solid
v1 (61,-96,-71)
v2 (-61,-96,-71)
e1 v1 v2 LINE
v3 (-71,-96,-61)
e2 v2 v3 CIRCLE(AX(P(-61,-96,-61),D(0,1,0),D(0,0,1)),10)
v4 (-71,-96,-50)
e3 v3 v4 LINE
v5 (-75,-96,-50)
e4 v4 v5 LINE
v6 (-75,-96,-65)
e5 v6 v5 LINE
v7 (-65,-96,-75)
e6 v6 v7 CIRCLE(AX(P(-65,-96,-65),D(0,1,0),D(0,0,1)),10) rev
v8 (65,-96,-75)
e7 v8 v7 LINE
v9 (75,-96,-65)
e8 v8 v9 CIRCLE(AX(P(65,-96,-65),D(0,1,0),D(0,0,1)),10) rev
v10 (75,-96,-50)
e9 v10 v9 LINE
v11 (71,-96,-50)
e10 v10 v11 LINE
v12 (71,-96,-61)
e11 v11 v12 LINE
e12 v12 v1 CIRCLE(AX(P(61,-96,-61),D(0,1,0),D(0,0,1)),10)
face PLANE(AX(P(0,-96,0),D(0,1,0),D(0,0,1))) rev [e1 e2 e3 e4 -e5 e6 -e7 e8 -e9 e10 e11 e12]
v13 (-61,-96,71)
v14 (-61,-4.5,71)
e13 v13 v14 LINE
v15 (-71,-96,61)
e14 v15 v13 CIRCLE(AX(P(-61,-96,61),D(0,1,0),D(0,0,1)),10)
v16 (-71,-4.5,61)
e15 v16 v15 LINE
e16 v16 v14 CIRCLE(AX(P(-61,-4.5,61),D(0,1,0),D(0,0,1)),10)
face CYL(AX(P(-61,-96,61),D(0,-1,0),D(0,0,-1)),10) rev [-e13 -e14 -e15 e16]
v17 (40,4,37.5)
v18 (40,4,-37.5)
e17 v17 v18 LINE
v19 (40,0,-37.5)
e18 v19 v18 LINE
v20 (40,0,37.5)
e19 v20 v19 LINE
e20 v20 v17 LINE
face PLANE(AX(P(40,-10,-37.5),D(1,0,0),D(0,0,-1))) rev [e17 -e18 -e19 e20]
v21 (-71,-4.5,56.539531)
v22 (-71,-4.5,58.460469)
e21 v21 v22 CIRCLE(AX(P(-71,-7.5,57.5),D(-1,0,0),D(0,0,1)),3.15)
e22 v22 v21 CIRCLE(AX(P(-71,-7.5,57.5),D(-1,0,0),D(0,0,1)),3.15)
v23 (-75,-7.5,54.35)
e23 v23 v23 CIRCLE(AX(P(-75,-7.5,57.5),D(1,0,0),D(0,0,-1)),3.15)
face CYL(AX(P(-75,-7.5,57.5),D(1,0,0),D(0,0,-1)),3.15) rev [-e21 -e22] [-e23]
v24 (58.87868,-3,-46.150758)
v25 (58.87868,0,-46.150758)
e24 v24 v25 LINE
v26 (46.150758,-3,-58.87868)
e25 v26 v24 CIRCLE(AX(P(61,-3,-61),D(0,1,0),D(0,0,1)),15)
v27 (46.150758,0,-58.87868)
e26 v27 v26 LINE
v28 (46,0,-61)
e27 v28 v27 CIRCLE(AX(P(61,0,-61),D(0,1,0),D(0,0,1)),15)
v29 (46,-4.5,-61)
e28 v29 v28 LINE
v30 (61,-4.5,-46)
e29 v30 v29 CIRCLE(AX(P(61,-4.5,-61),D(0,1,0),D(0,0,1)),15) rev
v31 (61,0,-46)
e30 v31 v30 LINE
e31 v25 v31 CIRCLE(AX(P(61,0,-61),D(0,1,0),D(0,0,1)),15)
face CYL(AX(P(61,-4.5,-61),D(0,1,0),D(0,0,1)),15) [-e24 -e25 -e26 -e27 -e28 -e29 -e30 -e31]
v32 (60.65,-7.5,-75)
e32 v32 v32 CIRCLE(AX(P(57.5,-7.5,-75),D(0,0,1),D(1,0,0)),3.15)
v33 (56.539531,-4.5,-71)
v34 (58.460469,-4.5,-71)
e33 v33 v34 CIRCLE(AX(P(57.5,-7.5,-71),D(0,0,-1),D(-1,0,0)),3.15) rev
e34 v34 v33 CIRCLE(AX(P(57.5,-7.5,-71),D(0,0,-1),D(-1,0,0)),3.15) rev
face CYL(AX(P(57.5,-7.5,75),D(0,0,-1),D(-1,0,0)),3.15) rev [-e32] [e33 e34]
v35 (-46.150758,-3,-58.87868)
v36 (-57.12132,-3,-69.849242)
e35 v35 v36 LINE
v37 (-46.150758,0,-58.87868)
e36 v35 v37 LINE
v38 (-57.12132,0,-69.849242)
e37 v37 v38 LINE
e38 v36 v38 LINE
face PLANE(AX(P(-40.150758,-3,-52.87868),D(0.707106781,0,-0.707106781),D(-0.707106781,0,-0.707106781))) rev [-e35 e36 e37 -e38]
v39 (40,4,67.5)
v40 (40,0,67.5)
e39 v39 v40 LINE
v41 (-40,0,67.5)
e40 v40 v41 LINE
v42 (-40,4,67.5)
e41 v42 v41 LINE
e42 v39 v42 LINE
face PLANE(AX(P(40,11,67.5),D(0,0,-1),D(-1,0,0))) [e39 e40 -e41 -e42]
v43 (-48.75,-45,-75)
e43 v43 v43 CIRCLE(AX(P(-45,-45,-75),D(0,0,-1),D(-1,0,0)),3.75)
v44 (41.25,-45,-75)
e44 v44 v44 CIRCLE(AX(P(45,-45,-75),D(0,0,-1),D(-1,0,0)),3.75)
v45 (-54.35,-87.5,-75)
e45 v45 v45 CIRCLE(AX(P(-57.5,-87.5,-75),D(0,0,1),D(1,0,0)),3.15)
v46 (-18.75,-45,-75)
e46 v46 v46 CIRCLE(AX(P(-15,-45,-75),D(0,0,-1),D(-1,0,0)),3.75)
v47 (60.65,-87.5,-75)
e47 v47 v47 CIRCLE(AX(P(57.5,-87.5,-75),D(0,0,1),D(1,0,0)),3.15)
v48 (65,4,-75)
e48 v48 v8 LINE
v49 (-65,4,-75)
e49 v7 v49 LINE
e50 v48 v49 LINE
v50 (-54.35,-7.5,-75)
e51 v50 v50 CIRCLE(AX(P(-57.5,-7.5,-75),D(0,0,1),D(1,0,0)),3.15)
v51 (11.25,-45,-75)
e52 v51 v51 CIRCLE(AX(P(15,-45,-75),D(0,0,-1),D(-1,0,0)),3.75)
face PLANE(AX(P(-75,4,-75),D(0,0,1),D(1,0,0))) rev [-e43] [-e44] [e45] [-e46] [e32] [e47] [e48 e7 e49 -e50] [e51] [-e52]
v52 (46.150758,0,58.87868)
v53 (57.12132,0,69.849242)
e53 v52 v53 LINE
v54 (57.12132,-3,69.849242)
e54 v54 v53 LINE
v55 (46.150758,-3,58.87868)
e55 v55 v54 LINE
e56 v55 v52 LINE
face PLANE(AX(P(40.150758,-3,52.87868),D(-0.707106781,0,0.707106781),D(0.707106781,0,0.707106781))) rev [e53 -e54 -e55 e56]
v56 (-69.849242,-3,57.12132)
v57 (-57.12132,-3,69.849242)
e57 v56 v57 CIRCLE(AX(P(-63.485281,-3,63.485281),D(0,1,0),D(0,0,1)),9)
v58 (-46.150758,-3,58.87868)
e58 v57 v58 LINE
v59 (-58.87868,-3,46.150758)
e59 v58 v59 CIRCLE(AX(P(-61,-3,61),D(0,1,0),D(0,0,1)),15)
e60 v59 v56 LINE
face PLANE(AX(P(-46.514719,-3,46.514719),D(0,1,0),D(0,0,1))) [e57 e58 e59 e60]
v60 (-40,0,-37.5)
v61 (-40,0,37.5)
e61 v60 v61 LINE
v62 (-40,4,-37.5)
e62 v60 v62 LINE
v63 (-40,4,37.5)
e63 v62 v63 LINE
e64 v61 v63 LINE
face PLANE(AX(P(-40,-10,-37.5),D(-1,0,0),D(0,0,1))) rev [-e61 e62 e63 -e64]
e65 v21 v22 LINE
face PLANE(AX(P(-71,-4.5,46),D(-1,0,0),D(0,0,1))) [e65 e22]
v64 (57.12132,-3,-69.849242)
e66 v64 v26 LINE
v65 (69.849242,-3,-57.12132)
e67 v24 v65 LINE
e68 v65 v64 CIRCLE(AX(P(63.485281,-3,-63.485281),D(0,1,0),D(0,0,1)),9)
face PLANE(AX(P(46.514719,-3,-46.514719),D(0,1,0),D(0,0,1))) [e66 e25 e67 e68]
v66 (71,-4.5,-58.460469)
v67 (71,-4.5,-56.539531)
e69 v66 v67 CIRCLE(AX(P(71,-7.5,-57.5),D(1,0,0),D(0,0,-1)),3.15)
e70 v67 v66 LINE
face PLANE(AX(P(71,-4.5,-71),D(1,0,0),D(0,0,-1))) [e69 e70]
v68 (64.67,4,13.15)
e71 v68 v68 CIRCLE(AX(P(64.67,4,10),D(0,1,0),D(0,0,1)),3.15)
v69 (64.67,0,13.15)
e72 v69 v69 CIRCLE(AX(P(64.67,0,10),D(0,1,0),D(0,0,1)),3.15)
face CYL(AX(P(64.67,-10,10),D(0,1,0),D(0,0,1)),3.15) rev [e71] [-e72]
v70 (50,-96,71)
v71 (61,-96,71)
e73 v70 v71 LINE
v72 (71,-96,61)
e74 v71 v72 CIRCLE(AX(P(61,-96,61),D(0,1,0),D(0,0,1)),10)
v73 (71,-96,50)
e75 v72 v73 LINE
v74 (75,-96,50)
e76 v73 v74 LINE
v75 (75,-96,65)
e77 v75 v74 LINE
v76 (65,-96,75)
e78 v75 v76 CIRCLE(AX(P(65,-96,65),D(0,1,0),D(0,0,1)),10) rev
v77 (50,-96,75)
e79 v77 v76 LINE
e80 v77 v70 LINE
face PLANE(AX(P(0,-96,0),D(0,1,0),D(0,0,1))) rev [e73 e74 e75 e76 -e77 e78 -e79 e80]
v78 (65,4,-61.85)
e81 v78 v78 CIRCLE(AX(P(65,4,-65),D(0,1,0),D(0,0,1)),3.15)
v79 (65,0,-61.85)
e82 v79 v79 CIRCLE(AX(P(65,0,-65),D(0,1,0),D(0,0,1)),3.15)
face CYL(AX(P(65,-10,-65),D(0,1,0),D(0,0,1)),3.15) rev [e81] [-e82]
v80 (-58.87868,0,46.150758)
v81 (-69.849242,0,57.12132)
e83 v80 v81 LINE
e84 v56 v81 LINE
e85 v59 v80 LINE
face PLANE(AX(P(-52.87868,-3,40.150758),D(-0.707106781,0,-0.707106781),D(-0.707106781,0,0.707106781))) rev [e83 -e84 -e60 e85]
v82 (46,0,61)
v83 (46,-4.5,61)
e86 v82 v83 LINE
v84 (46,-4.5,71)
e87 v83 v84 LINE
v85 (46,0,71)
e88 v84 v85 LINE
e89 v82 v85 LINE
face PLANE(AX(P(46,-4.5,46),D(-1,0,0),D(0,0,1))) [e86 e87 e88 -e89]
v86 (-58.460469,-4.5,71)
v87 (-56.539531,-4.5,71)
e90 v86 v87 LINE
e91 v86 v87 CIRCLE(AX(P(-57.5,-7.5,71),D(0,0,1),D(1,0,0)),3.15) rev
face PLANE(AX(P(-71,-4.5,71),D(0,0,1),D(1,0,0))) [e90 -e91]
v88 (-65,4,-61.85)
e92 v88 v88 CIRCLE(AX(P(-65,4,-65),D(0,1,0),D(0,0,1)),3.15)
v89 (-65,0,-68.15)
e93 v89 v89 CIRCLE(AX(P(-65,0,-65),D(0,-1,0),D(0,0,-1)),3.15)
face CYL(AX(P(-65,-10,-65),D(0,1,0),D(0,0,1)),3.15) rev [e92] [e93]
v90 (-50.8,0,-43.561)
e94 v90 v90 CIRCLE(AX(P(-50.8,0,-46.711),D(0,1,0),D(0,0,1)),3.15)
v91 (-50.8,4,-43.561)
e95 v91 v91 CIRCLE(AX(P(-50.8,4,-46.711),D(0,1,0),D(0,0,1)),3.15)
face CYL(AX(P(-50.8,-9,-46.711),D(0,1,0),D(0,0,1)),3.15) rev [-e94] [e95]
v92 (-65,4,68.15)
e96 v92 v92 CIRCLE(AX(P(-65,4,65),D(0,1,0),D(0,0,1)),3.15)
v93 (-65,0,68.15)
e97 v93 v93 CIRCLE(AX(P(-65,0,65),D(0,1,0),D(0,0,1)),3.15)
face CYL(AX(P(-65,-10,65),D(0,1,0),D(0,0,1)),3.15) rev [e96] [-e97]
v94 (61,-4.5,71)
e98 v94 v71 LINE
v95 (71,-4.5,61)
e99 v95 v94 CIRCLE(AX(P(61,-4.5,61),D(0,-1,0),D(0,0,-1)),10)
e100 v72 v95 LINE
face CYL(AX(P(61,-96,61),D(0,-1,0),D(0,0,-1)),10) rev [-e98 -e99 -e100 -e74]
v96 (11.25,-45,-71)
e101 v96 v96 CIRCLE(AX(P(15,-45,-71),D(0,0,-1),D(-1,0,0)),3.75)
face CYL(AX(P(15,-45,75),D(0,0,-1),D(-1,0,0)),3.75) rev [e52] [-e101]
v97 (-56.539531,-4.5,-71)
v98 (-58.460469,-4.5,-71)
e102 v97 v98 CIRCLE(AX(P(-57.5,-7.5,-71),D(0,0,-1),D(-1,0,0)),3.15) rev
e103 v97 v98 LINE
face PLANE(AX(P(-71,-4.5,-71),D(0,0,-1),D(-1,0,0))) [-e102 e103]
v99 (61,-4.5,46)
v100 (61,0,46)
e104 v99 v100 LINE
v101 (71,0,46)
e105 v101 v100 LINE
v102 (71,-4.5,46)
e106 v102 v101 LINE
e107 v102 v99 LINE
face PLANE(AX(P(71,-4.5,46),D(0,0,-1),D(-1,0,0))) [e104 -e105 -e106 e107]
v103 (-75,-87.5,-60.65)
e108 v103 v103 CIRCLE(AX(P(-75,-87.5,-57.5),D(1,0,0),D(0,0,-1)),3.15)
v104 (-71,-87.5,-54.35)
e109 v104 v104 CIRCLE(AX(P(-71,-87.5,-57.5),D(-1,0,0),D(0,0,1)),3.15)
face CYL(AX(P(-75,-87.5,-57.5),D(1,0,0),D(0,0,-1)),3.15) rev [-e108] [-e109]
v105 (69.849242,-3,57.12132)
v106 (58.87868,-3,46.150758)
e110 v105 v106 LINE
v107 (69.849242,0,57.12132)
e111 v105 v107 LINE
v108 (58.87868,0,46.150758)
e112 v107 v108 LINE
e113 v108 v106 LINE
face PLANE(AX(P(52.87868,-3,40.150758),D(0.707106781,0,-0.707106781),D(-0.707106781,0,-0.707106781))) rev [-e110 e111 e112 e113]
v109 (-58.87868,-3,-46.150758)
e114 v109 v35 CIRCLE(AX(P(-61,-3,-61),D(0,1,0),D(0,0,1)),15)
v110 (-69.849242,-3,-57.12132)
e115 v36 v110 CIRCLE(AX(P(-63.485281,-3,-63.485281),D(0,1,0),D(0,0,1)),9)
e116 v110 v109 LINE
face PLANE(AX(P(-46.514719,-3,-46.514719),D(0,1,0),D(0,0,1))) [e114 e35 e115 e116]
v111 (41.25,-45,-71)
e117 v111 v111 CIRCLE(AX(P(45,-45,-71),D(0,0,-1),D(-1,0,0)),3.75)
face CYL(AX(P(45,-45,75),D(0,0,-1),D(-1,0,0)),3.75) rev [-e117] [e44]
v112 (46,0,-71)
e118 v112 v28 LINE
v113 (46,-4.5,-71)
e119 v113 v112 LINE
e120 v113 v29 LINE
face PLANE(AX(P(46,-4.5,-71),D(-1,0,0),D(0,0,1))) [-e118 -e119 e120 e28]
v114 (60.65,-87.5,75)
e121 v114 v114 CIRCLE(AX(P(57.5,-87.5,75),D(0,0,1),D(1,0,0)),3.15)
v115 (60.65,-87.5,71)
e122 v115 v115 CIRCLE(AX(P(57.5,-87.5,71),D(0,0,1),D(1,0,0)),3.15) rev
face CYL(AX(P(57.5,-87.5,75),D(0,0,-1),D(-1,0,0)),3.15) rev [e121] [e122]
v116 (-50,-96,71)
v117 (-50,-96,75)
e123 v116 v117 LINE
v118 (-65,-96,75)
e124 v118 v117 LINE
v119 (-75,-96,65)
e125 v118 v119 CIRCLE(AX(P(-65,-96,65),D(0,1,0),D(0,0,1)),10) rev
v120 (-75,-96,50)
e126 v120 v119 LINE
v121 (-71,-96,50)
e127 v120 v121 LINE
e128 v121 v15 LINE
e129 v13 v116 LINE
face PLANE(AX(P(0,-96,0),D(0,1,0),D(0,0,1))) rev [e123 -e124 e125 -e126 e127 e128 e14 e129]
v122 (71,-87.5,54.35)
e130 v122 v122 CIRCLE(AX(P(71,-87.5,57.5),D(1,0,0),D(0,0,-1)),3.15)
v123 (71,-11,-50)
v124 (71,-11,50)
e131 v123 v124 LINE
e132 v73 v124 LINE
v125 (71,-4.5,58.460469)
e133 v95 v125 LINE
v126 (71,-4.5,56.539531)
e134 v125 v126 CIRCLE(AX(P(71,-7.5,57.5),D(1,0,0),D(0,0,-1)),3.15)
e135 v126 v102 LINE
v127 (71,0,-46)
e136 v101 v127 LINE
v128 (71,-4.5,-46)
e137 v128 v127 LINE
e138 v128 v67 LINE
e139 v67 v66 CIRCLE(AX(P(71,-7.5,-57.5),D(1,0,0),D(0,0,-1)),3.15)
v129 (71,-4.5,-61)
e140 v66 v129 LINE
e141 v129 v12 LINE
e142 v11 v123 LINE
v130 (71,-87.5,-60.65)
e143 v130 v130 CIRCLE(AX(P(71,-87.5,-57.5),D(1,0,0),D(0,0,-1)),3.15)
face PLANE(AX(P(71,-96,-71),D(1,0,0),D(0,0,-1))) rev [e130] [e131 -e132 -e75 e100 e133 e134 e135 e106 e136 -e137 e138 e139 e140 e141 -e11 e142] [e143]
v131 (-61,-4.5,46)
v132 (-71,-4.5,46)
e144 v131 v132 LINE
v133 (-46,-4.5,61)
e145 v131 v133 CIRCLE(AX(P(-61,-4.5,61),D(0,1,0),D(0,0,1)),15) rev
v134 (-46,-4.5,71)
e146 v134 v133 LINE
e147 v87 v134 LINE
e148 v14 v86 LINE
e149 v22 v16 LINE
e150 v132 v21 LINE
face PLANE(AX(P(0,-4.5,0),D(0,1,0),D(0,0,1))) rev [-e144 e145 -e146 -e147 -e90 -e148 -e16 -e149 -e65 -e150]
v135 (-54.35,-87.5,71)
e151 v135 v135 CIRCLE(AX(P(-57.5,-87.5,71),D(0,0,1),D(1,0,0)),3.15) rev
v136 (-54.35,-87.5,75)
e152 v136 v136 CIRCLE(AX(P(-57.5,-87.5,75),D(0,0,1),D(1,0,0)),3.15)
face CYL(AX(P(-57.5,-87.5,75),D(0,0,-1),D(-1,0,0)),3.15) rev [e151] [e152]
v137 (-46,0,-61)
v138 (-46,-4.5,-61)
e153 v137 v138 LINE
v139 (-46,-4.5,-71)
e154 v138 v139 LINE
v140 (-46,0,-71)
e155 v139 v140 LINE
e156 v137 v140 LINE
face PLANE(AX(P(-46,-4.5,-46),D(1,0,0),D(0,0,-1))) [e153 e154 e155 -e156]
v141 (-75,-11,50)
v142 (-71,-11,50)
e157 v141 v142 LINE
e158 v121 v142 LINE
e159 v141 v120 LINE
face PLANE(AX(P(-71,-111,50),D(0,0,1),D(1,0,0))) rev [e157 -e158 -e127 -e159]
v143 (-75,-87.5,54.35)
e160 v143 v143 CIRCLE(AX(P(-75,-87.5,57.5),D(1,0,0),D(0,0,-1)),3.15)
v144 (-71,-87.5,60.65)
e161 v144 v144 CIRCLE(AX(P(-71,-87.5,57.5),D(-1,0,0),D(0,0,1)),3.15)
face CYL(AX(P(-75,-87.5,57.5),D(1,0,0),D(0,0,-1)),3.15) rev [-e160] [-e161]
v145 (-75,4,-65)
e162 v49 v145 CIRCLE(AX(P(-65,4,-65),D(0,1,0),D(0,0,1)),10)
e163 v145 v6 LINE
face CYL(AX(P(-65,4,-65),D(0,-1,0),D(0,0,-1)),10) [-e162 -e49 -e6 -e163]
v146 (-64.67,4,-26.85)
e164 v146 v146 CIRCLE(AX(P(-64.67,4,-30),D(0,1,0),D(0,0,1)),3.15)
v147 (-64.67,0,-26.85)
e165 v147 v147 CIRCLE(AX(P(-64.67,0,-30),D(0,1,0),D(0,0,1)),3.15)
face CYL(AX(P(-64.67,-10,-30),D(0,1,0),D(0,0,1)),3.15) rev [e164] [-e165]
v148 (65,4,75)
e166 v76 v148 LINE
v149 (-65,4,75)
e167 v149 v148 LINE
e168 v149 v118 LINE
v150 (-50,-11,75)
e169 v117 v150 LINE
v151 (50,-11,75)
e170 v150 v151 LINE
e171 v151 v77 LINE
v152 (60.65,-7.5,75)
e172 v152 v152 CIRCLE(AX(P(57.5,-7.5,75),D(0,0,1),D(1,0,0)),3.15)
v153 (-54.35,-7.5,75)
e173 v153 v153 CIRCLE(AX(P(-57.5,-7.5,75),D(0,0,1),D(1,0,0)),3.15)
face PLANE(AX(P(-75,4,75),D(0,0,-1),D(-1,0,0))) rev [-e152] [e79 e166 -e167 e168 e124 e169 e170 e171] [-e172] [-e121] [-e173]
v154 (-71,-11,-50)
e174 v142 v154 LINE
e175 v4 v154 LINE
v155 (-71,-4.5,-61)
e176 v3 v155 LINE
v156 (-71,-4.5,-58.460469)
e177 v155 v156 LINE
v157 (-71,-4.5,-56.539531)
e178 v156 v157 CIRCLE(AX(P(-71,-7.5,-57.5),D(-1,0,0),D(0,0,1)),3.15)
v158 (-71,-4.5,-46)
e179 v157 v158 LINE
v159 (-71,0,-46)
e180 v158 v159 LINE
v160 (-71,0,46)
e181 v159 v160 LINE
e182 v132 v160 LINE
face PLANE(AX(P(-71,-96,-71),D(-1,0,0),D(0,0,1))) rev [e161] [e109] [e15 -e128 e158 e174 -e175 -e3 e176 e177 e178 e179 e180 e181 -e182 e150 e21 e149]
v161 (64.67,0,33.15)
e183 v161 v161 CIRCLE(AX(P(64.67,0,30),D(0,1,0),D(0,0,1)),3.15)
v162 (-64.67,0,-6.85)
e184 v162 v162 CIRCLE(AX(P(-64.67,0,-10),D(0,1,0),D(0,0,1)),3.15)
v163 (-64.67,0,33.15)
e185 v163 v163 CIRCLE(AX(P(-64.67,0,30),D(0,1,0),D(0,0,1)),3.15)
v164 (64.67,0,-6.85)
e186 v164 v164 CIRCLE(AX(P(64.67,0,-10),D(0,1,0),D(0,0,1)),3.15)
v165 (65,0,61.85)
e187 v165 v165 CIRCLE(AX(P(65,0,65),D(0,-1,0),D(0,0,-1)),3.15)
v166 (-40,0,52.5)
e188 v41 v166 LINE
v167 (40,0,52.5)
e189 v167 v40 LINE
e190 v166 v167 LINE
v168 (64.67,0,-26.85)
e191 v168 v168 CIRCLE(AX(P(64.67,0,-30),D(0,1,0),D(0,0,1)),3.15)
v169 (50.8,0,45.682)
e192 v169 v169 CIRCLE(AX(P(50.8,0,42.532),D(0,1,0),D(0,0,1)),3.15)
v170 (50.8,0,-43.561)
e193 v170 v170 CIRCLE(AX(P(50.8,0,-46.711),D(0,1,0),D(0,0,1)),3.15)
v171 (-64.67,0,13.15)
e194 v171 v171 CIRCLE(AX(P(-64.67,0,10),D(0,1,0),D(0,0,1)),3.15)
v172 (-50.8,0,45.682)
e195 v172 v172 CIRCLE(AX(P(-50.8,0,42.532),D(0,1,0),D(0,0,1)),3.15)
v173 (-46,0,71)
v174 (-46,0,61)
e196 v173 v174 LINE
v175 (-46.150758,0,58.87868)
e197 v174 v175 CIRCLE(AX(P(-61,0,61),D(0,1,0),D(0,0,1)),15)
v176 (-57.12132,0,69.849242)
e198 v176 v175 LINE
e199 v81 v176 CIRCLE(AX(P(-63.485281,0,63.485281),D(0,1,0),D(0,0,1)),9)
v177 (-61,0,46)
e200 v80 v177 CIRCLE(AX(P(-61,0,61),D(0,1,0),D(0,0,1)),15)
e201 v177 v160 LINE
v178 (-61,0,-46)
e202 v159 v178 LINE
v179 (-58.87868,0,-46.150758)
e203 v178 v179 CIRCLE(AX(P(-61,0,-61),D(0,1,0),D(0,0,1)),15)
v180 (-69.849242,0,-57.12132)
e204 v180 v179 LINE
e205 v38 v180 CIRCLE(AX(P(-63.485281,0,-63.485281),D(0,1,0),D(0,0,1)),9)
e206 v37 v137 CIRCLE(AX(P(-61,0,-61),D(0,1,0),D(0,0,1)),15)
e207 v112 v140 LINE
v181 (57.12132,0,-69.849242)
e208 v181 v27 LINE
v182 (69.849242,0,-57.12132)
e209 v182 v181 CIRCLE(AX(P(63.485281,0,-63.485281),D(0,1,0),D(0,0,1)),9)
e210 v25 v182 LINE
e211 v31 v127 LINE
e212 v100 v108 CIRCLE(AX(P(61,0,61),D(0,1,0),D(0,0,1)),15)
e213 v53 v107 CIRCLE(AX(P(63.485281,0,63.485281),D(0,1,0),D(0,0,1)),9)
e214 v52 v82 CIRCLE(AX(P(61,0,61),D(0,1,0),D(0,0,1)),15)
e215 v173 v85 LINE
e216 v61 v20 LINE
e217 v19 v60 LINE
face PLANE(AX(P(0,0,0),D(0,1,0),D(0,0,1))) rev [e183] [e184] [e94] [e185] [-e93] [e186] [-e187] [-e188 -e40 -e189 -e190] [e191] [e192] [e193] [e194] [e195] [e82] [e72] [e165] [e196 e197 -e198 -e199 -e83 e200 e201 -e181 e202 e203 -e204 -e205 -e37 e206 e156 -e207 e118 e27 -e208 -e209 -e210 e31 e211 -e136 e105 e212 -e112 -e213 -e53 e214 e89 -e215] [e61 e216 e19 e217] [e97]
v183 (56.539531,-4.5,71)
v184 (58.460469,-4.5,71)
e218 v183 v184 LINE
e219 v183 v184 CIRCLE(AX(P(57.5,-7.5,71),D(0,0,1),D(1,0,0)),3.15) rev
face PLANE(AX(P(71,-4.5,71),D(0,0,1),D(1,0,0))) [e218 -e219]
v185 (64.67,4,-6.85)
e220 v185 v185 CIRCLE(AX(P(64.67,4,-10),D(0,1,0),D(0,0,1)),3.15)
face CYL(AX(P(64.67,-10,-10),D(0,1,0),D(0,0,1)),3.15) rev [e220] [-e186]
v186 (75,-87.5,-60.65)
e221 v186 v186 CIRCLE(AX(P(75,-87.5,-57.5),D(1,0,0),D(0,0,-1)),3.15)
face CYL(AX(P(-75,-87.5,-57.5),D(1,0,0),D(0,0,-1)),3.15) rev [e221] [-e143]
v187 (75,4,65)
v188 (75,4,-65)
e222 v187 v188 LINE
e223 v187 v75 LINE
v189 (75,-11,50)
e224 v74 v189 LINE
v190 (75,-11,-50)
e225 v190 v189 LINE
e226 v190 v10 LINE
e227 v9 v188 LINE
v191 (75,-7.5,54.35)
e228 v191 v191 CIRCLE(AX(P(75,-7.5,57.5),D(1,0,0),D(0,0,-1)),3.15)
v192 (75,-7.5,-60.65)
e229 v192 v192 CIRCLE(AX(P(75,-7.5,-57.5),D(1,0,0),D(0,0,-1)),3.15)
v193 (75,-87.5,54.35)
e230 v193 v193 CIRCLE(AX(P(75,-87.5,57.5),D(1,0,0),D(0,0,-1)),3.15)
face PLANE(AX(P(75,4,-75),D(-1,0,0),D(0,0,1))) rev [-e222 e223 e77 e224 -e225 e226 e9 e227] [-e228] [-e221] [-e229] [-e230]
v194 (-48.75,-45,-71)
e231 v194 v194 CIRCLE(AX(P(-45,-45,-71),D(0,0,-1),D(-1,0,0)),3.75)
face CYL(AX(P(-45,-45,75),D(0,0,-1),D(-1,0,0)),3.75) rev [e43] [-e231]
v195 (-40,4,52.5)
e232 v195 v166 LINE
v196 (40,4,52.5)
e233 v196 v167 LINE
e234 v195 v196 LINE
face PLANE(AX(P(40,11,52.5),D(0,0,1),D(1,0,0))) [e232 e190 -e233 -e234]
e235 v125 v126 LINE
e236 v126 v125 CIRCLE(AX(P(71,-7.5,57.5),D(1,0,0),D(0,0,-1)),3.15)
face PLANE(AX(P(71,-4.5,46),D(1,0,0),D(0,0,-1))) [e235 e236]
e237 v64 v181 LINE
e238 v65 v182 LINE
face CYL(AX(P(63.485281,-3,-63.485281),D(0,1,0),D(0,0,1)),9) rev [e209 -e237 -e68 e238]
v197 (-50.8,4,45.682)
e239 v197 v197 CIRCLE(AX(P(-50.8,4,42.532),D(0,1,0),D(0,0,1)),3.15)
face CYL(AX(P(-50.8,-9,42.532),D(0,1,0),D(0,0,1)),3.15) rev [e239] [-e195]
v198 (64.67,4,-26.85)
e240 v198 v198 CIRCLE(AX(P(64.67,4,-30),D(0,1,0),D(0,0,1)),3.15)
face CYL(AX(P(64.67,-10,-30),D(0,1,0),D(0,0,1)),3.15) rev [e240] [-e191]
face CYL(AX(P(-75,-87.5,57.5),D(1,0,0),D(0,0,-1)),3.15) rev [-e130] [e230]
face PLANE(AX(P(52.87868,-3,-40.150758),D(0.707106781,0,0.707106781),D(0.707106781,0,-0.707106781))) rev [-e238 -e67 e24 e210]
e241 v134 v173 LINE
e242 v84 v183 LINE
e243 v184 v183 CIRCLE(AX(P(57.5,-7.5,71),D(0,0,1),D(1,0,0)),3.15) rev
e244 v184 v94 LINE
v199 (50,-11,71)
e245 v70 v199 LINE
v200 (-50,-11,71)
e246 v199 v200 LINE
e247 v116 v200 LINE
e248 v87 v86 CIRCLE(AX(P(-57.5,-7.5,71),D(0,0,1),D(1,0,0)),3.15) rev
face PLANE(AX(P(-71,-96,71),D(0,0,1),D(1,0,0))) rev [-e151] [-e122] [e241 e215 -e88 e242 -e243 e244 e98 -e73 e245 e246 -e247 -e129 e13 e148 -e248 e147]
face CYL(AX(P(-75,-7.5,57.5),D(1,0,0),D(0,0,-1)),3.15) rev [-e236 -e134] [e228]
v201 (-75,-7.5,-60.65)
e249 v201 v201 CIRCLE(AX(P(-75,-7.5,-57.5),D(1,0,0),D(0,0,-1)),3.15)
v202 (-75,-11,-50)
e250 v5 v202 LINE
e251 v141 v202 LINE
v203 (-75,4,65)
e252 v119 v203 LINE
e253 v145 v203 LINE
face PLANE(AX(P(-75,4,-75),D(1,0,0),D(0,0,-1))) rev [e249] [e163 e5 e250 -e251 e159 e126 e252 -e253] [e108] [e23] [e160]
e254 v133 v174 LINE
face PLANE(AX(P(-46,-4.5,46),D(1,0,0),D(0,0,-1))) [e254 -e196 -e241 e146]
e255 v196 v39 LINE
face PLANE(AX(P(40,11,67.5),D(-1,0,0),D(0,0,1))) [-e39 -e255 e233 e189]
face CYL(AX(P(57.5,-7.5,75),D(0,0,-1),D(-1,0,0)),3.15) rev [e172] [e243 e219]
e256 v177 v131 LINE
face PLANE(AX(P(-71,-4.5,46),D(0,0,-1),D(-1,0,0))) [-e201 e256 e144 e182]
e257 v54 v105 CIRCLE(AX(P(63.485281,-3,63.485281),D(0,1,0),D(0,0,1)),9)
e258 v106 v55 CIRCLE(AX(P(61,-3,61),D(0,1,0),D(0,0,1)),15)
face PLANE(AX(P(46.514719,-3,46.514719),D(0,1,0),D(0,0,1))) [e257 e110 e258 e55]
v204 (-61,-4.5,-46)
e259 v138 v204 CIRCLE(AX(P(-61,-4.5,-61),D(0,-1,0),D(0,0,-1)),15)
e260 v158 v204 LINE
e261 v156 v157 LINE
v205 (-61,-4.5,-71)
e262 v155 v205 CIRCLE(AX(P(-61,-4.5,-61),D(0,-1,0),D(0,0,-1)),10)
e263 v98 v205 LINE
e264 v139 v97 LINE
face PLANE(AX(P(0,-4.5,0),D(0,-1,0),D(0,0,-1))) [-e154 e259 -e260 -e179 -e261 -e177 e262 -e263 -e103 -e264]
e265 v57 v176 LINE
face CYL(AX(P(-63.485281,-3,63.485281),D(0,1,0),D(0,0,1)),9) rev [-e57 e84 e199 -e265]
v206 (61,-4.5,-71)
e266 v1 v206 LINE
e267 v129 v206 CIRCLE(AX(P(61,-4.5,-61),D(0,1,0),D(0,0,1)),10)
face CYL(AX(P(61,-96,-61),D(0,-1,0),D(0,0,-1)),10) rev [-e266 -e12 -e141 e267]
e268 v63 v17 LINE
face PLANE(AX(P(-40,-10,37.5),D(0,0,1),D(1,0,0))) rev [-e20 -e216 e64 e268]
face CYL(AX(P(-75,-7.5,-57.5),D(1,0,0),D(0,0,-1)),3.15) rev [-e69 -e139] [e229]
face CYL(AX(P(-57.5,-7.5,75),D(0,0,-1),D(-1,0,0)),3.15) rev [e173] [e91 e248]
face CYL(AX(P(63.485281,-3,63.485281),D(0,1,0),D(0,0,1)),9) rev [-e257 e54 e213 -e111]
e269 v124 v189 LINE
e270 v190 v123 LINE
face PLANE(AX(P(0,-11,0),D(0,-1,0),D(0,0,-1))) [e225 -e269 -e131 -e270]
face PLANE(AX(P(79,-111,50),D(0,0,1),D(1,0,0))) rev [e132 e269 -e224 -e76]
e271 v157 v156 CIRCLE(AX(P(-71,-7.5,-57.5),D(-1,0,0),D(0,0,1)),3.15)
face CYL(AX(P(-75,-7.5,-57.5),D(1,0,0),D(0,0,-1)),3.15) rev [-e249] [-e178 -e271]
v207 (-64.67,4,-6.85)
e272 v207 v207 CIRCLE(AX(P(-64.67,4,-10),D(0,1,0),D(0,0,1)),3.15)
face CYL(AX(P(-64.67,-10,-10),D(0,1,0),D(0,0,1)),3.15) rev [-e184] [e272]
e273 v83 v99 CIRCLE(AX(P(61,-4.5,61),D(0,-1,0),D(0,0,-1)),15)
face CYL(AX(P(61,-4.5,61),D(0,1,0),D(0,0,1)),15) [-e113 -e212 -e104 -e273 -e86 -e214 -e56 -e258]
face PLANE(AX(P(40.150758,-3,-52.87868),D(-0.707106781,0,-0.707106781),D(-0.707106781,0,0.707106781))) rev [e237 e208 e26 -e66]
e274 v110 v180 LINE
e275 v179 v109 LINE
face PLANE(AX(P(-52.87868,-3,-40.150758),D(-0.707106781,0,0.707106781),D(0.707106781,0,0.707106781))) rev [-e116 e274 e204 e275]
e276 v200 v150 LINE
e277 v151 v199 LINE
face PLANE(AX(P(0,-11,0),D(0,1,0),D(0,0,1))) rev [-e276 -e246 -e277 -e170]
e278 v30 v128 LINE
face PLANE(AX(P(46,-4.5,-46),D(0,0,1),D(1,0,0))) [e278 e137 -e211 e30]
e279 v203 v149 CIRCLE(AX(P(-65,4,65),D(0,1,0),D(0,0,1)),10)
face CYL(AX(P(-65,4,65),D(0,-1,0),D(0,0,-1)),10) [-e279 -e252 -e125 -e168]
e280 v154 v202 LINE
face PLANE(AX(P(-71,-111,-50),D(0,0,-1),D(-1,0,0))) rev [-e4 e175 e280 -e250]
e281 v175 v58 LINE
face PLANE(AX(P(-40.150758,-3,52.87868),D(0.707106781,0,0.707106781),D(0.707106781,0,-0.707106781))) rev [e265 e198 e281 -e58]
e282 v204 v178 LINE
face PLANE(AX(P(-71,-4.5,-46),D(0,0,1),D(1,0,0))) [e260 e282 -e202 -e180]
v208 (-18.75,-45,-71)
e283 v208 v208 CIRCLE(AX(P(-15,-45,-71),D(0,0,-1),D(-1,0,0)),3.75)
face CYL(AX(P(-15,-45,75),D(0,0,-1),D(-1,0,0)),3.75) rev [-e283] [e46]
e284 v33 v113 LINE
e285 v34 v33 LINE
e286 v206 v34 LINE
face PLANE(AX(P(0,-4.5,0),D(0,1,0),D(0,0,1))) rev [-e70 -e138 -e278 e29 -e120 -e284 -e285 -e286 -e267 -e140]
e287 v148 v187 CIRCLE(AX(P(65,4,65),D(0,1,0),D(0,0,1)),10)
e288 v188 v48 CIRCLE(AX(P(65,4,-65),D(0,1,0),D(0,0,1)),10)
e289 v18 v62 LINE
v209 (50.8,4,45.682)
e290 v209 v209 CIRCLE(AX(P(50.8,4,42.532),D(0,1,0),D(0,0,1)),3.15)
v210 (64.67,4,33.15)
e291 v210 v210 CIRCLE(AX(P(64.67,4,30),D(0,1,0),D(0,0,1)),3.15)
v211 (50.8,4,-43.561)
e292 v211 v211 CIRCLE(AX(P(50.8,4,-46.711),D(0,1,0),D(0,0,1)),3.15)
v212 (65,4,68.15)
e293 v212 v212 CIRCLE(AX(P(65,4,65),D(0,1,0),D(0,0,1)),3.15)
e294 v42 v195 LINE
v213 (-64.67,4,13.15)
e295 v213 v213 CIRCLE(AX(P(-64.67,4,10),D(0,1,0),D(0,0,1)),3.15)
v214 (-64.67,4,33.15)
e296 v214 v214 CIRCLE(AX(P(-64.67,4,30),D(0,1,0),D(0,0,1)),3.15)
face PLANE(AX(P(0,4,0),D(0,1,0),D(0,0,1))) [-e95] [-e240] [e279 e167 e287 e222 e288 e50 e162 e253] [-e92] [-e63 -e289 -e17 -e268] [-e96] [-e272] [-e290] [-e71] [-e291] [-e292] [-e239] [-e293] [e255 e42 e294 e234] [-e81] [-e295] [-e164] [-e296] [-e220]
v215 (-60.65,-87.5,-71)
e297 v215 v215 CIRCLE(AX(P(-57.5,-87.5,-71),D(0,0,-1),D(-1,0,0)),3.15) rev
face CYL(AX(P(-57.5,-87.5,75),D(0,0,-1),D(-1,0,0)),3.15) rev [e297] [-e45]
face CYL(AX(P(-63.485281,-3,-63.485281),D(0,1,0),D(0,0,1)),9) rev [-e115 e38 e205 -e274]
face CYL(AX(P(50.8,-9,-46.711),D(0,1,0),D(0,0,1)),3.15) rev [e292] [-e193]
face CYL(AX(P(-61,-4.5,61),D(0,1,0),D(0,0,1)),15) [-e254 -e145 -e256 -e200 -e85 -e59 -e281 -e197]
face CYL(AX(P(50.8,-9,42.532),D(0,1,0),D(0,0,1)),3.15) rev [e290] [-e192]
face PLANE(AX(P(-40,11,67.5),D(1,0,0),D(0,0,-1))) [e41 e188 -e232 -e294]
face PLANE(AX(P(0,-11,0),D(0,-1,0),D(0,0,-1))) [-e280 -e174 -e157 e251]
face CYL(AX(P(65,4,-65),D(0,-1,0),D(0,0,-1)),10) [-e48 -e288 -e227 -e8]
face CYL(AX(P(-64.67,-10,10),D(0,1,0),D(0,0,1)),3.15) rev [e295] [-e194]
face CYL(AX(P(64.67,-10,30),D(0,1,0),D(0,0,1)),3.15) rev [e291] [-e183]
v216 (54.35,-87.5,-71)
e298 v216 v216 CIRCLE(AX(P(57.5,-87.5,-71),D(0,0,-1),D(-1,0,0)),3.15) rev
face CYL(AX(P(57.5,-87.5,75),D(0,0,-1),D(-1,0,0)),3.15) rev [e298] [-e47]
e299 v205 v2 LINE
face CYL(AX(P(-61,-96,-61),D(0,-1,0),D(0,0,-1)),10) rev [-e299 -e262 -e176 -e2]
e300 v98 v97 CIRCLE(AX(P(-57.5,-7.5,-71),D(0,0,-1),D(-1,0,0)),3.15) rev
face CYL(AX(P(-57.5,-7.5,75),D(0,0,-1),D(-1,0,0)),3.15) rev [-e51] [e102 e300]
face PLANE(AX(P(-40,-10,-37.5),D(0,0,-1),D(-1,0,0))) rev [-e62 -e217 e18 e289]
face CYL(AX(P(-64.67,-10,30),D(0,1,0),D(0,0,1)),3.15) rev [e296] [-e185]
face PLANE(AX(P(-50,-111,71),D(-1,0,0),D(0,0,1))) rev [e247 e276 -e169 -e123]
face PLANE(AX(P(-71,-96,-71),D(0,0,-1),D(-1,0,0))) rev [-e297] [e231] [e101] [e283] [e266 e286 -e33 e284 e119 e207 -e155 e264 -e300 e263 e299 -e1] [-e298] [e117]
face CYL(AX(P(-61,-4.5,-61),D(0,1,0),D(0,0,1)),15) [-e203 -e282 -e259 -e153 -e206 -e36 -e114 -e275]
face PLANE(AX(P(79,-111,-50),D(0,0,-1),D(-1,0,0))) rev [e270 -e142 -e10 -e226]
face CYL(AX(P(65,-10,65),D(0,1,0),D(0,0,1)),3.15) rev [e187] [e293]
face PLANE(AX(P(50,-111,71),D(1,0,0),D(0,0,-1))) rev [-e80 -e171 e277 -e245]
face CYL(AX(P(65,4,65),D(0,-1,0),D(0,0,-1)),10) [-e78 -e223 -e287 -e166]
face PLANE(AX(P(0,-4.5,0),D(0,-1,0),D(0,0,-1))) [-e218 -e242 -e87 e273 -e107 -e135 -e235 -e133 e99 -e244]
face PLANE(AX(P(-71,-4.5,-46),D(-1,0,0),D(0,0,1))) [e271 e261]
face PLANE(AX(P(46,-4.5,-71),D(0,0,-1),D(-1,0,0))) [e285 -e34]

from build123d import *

# Parameters (mm, degrees)
SKETCH9_R                 = 3.15
BOSS_EXTRUDE10_DEPTH      = 10
BOSS_EXTRUDE10_2_DEPTH    = 10
BOSS_EXTRUDE10_3_DEPTH    = 10
BOSS_EXTRUDE10_4_DEPTH    = 10
BOSS_EXTRUDE10_5_DEPTH    = 10
BOSS_EXTRUDE10_6_DEPTH    = 10
BOSS_EXTRUDE10_7_DEPTH    = 10
BOSS_EXTRUDE10_8_DEPTH    = 10
SKETCH10_W                = 80
SKETCH10_H                = 75
BOSS_EXTRUDE12_DEPTH      = 10
SKETCH15_R                = 3.15
BOSS_EXTRUDE17_DEPTH      = 10
BOSS_EXTRUDE17_2_DEPTH    = 10
BOSS_EXTRUDE17_3_DEPTH    = 10
BOSS_EXTRUDE17_4_DEPTH    = 10
SKETCH22_W                = 150
SKETCH22_H                = 150
BOSS_EXTRUDE19_DEPTH      = 4
SKETCH29_W                = 150
SKETCH29_H                = 150
SKETCH29_W_2              = 142
SKETCH29_H_2              = 142
BOSS_EXTRUDE20_DEPTH      = 100
FILLET12_R                = 10
SKETCH31_W                = 8
SKETCH31_H                = 100
BOSS_EXTRUDE21_DEPTH      = 100
BOSS_EXTRUDE21_2_DEPTH    = 100
SKETCH31_W_2              = 100
SKETCH31_H_2              = 8
BOSS_EXTRUDE21_3_DEPTH    = 100
SKETCH32_R                = 3.15
BOSS_EXTRUDE22_DEPTH      = 75
BOSS_EXTRUDE22_2_DEPTH    = 75
BOSS_EXTRUDE22_3_DEPTH    = 75
BOSS_EXTRUDE22_4_DEPTH    = 75
SKETCH34_R                = 3.15
BOSS_EXTRUDE23_DEPTH      = 150
BOSS_EXTRUDE23_2_DEPTH    = 150
BOSS_EXTRUDE23_3_DEPTH    = 150
BOSS_EXTRUDE23_4_DEPTH    = 150
SKETCH35_R                = 3.15
BOSS_EXTRUDE25_DEPTH      = 10
BOSS_EXTRUDE25_2_DEPTH    = 10
BOSS_EXTRUDE25_3_DEPTH    = 10
BOSS_EXTRUDE25_4_DEPTH    = 10
FILLET13_R                = 10
BOSS_EXTRUDE27_DEPTH      = 11
BOSS_EXTRUDE27_DEPTH_BACK = 96
SKETCH38_W                = 80
SKETCH38_H                = 15
BOSS_EXTRUDE28_DEPTH      = 3
BOSS_EXTRUDE28_2_DEPTH    = 3
BOSS_EXTRUDE28_3_DEPTH    = 3
BOSS_EXTRUDE28_4_DEPTH    = 3
SKETCH40_W                = 25
SKETCH40_H                = 25
BOSS_EXTRUDE31_DEPTH      = 4.5
BOSS_EXTRUDE31_2_DEPTH    = 4.5
BOSS_EXTRUDE31_3_DEPTH    = 4.5
BOSS_EXTRUDE31_4_DEPTH    = 4.5
SKETCH41_R                = 3.75
BOSS_EXTRUDE32_DEPTH      = 150
BOSS_EXTRUDE32_2_DEPTH    = 150
BOSS_EXTRUDE32_3_DEPTH    = 150
BOSS_EXTRUDE32_4_DEPTH    = 150
FILLET14_R                = 15


with BuildPart() as part:
    # Sketch9 → Boss-Extrude10 (new, symmetric)
    with BuildSketch(Plane(origin=(0, 0, 0), x_dir=(1, 0, 0), z_dir=(0, 1, 0))):
        with Locations(Location((64.67, -30, 0), (0, 0, 270))):
            Circle(SKETCH9_R)
    extrude(amount=BOSS_EXTRUDE10_DEPTH, both=True)


with BuildPart() as body_2:
    # Sketch9 → Boss-Extrude10 2 (new, symmetric)
    with BuildSketch(Plane(origin=(0, 0, 0), x_dir=(1, 0, 0), z_dir=(0, 1, 0))):
        with Locations(Location((-64.67, -30, 0), (0, 0, 270))):
            Circle(SKETCH9_R)
    extrude(amount=BOSS_EXTRUDE10_2_DEPTH, both=True)


with BuildPart() as body_3:
    # Sketch9 → Boss-Extrude10 3 (new, symmetric)
    with BuildSketch(Plane(origin=(0, 0, 0), x_dir=(1, 0, 0), z_dir=(0, 1, 0))):
        with Locations(Location((64.67, -10, 0), (0, 0, 270))):
            Circle(SKETCH9_R)
    extrude(amount=BOSS_EXTRUDE10_3_DEPTH, both=True)


with BuildPart() as body_4:
    # Sketch9 → Boss-Extrude10 4 (new, symmetric)
    with BuildSketch(Plane(origin=(0, 0, 0), x_dir=(1, 0, 0), z_dir=(0, 1, 0))):
        with Locations(Location((-64.67, -10, 0), (0, 0, 270))):
            Circle(SKETCH9_R)
    extrude(amount=BOSS_EXTRUDE10_4_DEPTH, both=True)


with BuildPart() as body_5:
    # Sketch9 → Boss-Extrude10 5 (new, symmetric)
    with BuildSketch(Plane(origin=(0, 0, 0), x_dir=(1, 0, 0), z_dir=(0, 1, 0))):
        with Locations(Location((64.67, 10, 0), (0, 0, 270))):
            Circle(SKETCH9_R)
    extrude(amount=BOSS_EXTRUDE10_5_DEPTH, both=True)


with BuildPart() as body_6:
    # Sketch9 → Boss-Extrude10 6 (new, symmetric)
    with BuildSketch(Plane(origin=(0, 0, 0), x_dir=(1, 0, 0), z_dir=(0, 1, 0))):
        with Locations(Location((-64.67, 10, 0), (0, 0, 270))):
            Circle(SKETCH9_R)
    extrude(amount=BOSS_EXTRUDE10_6_DEPTH, both=True)


with BuildPart() as body_7:
    # Sketch9 → Boss-Extrude10 7 (new, symmetric)
    with BuildSketch(Plane(origin=(0, 0, 0), x_dir=(1, 0, 0), z_dir=(0, 1, 0))):
        with Locations(Location((64.67, 30, 0), (0, 0, 270))):
            Circle(SKETCH9_R)
    extrude(amount=BOSS_EXTRUDE10_7_DEPTH, both=True)


with BuildPart() as body_8:
    # Sketch9 → Boss-Extrude10 8 (new, symmetric)
    with BuildSketch(Plane(origin=(0, 0, 0), x_dir=(1, 0, 0), z_dir=(0, 1, 0))):
        with Locations(Location((-64.67, 30, 0), (0, 0, 270))):
            Circle(SKETCH9_R)
    extrude(amount=BOSS_EXTRUDE10_8_DEPTH, both=True)


with BuildPart() as body_9:
    # Sketch10 → Boss-Extrude12 (new, symmetric)
    with BuildSketch(Plane(origin=(0, 0, 0), x_dir=(1, 0, 0), z_dir=(0, 1, 0))):
        Rectangle(SKETCH10_W, SKETCH10_H)
    extrude(amount=BOSS_EXTRUDE12_DEPTH, both=True)


with BuildPart() as body_10:
    # Sketch15 → Boss-Extrude17 (new, symmetric)
    with BuildSketch(Plane(origin=(0, 0, 0), x_dir=(1, 0, 0), z_dir=(0, 1, 0))):
        with Locations(Location((-50.8, 46.711, 0), (0, 0, 270))):
            Circle(SKETCH15_R)
    extrude(amount=BOSS_EXTRUDE17_DEPTH, both=True)


with BuildPart() as body_11:
    # Sketch15 → Boss-Extrude17 2 (new, symmetric)
    with BuildSketch(Plane(origin=(0, 0, 0), x_dir=(1, 0, 0), z_dir=(0, 1, 0))):
        with Locations(Location((50.8, -42.532, 0), (0, 0, 270))):
            Circle(SKETCH15_R)
    extrude(amount=BOSS_EXTRUDE17_2_DEPTH, both=True)


with BuildPart() as body_12:
    # Sketch15 → Boss-Extrude17 3 (new, symmetric)
    with BuildSketch(Plane(origin=(0, 0, 0), x_dir=(1, 0, 0), z_dir=(0, 1, 0))):
        with Locations(Location((-50.8, -42.532, 0), (0, 0, 270))):
            Circle(SKETCH15_R)
    extrude(amount=BOSS_EXTRUDE17_3_DEPTH, both=True)


with BuildPart() as body_13:
    # Sketch15 → Boss-Extrude17 4 (new, symmetric)
    with BuildSketch(Plane(origin=(0, 0, 0), x_dir=(1, 0, 0), z_dir=(0, 1, 0))):
        with Locations(Location((50.8, 46.711, 0), (0, 0, 270))):
            Circle(SKETCH15_R)
    extrude(amount=BOSS_EXTRUDE17_4_DEPTH, both=True)


with BuildPart() as body_10_1:
    # Body-Move/Copy4: moved
    add(body_10.part.moved(Location((0, 1, 0))))


with BuildPart() as body_13_1:
    # Body-Move/Copy4: moved
    add(body_13.part.moved(Location((0, 1, 0))))


with BuildPart() as body_12_1:
    # Body-Move/Copy4: moved
    add(body_12.part.moved(Location((0, 1, 0))))


with BuildPart() as body_11_1:
    # Body-Move/Copy4: moved
    add(body_11.part.moved(Location((0, 1, 0))))


with BuildPart() as body_14:
    # Sketch22 → Boss-Extrude19 (new body)
    with BuildSketch(Plane(origin=(0, 0, 0), x_dir=(1, 0, 0), z_dir=(0, 1, 0))):
        Rectangle(SKETCH22_W, SKETCH22_H)
    extrude(amount=BOSS_EXTRUDE19_DEPTH)

    # Sketch29 → Boss-Extrude20 (add)
    with BuildSketch(Plane(origin=(0, 4, 0), x_dir=(1, 0, 0), z_dir=(0, 1, 0))):
        Rectangle(SKETCH29_W, SKETCH29_H)
        Rectangle(SKETCH29_W_2, SKETCH29_H_2, mode=Mode.SUBTRACT)
    extrude(amount=-BOSS_EXTRUDE20_DEPTH)

    # Fillet12
    fillet12_edges = [body_14.edges().sort_by_distance(p)[0] for p in [
        (75, -46, 75),
        (-75, -46, 75),
        (-75, -46, -75),
        (75, -46, -75),
    ]]
    fillet(fillet12_edges, radius=FILLET12_R)


with BuildPart() as body_15:
    # Sketch31 → Boss-Extrude21 (new body)
    with BuildSketch(Plane(origin=(0, 4, 0), x_dir=(1, 0, 0), z_dir=(0, 1, 0))):
        with Locations((-75, 0)):
            Rectangle(SKETCH31_W, SKETCH31_H)
    extrude(amount=-BOSS_EXTRUDE21_DEPTH)


with BuildPart() as body_16:
    # Sketch31 → Boss-Extrude21 2 (new body)
    with BuildSketch(Plane(origin=(0, 4, 0), x_dir=(1, 0, 0), z_dir=(0, 1, 0))):
        with Locations((75, 0)):
            Rectangle(SKETCH31_W, SKETCH31_H)
    extrude(amount=-BOSS_EXTRUDE21_2_DEPTH)


with BuildPart() as body_17:
    # Sketch31 → Boss-Extrude21 3 (new body)
    with BuildSketch(Plane(origin=(0, 4, 0), x_dir=(1, 0, 0), z_dir=(0, 1, 0))):
        with Locations((0, -75)):
            Rectangle(SKETCH31_W_2, SKETCH31_H_2)
    extrude(amount=-BOSS_EXTRUDE21_3_DEPTH)


with BuildPart() as body_17_1:
    # Body-Move/Copy5: moved
    add(body_17.part.moved(Location((0, -15, 0))))


with BuildPart() as body_16_1:
    # Body-Move/Copy5: moved
    add(body_16.part.moved(Location((0, -15, 0))))


with BuildPart() as body_15_1:
    # Body-Move/Copy5: moved
    add(body_15.part.moved(Location((0, -15, 0))))


with BuildPart() as body_18:
    # Sketch32 → Boss-Extrude22 (new, symmetric)
    with BuildSketch(Plane.XY):
        with Locations((57.5, -7.5)):
            Circle(SKETCH32_R)
    extrude(amount=BOSS_EXTRUDE22_DEPTH, both=True)


with BuildPart() as body_19:
    # Sketch32 → Boss-Extrude22 2 (new, symmetric)
    with BuildSketch(Plane.XY):
        with Locations((-57.5, -7.5)):
            Circle(SKETCH32_R)
    extrude(amount=BOSS_EXTRUDE22_2_DEPTH, both=True)


with BuildPart() as body_20:
    # Sketch32 → Boss-Extrude22 3 (new, symmetric)
    with BuildSketch(Plane.XY):
        with Locations((-57.5, -87.5)):
            Circle(SKETCH32_R)
    extrude(amount=BOSS_EXTRUDE22_3_DEPTH, both=True)


with BuildPart() as body_21:
    # Sketch32 → Boss-Extrude22 4 (new, symmetric)
    with BuildSketch(Plane.XY):
        with Locations((57.5, -87.5)):
            Circle(SKETCH32_R)
    extrude(amount=BOSS_EXTRUDE22_4_DEPTH, both=True)


with BuildPart() as body_22:
    # Sketch34 → Boss-Extrude23 (new body)
    with BuildSketch(Plane(origin=(75, 0, 0), x_dir=(0, 0, -1), z_dir=(1, 0, 0))):
        with Locations((-57.5, -7.5)):
            Circle(SKETCH34_R)
    extrude(amount=-BOSS_EXTRUDE23_DEPTH)


with BuildPart() as body_23:
    # Sketch34 → Boss-Extrude23 2 (new body)
    with BuildSketch(Plane(origin=(75, 0, 0), x_dir=(0, 0, -1), z_dir=(1, 0, 0))):
        with Locations((57.5, -7.5)):
            Circle(SKETCH34_R)
    extrude(amount=-BOSS_EXTRUDE23_2_DEPTH)


with BuildPart() as body_24:
    # Sketch34 → Boss-Extrude23 3 (new body)
    with BuildSketch(Plane(origin=(75, 0, 0), x_dir=(0, 0, -1), z_dir=(1, 0, 0))):
        with Locations((-57.5, -87.5)):
            Circle(SKETCH34_R)
    extrude(amount=-BOSS_EXTRUDE23_3_DEPTH)


with BuildPart() as body_25:
    # Sketch34 → Boss-Extrude23 4 (new body)
    with BuildSketch(Plane(origin=(75, 0, 0), x_dir=(0, 0, -1), z_dir=(1, 0, 0))):
        with Locations((57.5, -87.5)):
            Circle(SKETCH34_R)
    extrude(amount=-BOSS_EXTRUDE23_4_DEPTH)


with BuildPart() as body_14_1:
    add(body_14.part)

    # Combine4: cut body 24, body 23, body 22, body 21, body 20, body 19, body 18, body 15, body 16, body 17, body 25
    add(body_24.part, mode=Mode.SUBTRACT)
    add(body_23.part, mode=Mode.SUBTRACT)
    add(body_22.part, mode=Mode.SUBTRACT)
    add(body_21.part, mode=Mode.SUBTRACT)
    add(body_20.part, mode=Mode.SUBTRACT)
    add(body_19.part, mode=Mode.SUBTRACT)
    add(body_18.part, mode=Mode.SUBTRACT)
    add(body_15_1.part, mode=Mode.SUBTRACT)
    add(body_16_1.part, mode=Mode.SUBTRACT)
    add(body_17_1.part, mode=Mode.SUBTRACT)
    add(body_25.part, mode=Mode.SUBTRACT)

    # Fillet13
    fillet13_edges = [body_14_1.edges().sort_by_distance(p)[0] for p in [
        (71, -48, 71),
        (-71, -48, 71),
        (-71, -48, -71),
        (71, -48, -71),
    ]]
    fillet(fillet13_edges, radius=FILLET13_R)


with BuildPart() as body_15_2:
    # Sketch35 → Boss-Extrude25 (new, symmetric)
    with BuildSketch(Plane(origin=(0, 0, 0), x_dir=(1, 0, 0), z_dir=(0, 1, 0))):
        with Locations(Location((65, -65, 0), (0, 0, 270))):
            Circle(SKETCH35_R)
    extrude(amount=BOSS_EXTRUDE25_DEPTH, both=True)


with BuildPart() as body_16_2:
    # Sketch35 → Boss-Extrude25 2 (new, symmetric)
    with BuildSketch(Plane(origin=(0, 0, 0), x_dir=(1, 0, 0), z_dir=(0, 1, 0))):
        with Locations(Location((-65, 65, 0), (0, 0, 270))):
            Circle(SKETCH35_R)
    extrude(amount=BOSS_EXTRUDE25_2_DEPTH, both=True)


with BuildPart() as body_17_2:
    # Sketch35 → Boss-Extrude25 3 (new, symmetric)
    with BuildSketch(Plane(origin=(0, 0, 0), x_dir=(1, 0, 0), z_dir=(0, 1, 0))):
        with Locations(Location((-65, -65, 0), (0, 0, 270))):
            Circle(SKETCH35_R)
    extrude(amount=BOSS_EXTRUDE25_3_DEPTH, both=True)


with BuildPart() as body_18_2:
    # Sketch35 → Boss-Extrude25 4 (new, symmetric)
    with BuildSketch(Plane(origin=(0, 0, 0), x_dir=(1, 0, 0), z_dir=(0, 1, 0))):
        with Locations(Location((65, 65, 0), (0, 0, 270))):
            Circle(SKETCH35_R)
    extrude(amount=BOSS_EXTRUDE25_4_DEPTH, both=True)


with BuildPart() as body_19_2:
    # Sketch38 → Boss-Extrude27 (new, two sides: drawn at the far end of the back side and taken through both)
    with BuildSketch(Plane(origin=(0, 0, 0), x_dir=(1, 0, 0), z_dir=(0, 1, 0)).offset(-BOSS_EXTRUDE27_DEPTH_BACK)):
        with Locations((0, -60)):
            Rectangle(SKETCH38_W, SKETCH38_H)
    extrude(amount=BOSS_EXTRUDE27_DEPTH + BOSS_EXTRUDE27_DEPTH_BACK)


with BuildPart() as body_14_2:
    add(body_14_1.part)

    # Combine12: cut body 19 2, body 17 2, body 16 2, body 15 2, body 18 2
    add(body_19_2.part, mode=Mode.SUBTRACT)
    add(body_17_2.part, mode=Mode.SUBTRACT)
    add(body_16_2.part, mode=Mode.SUBTRACT)
    add(body_15_2.part, mode=Mode.SUBTRACT)
    add(body_18_2.part, mode=Mode.SUBTRACT)

    # Combine13: cut body 11, body 12, body 13, body 10, body 9, body 2, part
    add(body_11_1.part, mode=Mode.SUBTRACT)
    add(body_12_1.part, mode=Mode.SUBTRACT)
    add(body_13_1.part, mode=Mode.SUBTRACT)
    add(body_10_1.part, mode=Mode.SUBTRACT)
    add(body_9.part, mode=Mode.SUBTRACT)
    add(body_2.part, mode=Mode.SUBTRACT)
    add(part.part, mode=Mode.SUBTRACT)


with BuildPart() as body_8_2:
    # Sketch36 → Boss-Extrude28 (new body)
    with BuildSketch(Plane(origin=(0, 0, 0), x_dir=(1, 0, 0), z_dir=(0, 1, 0))):
        with BuildLine():
            Line((-40.150757595, -52.878679656), (-57.121320344, -69.849242405))
            ThreePointArc((-57.121320344, -69.849242405), (-69.849242405, -69.849242405), (-69.849242405, -57.121320344))
            Line((-69.849242405, -57.121320344), (-52.878679656, -40.150757595))
            ThreePointArc((-52.878679656, -40.150757595), (-40.150757595, -40.150757595), (-40.150757595, -52.878679656))
        make_face()
    extrude(amount=-BOSS_EXTRUDE28_DEPTH)


with BuildPart() as body_9_2:
    # Sketch36 → Boss-Extrude28 2 (new body)
    with BuildSketch(Plane(origin=(0, 0, 0), x_dir=(1, 0, 0), z_dir=(0, 1, 0))):
        with BuildLine():
            Line((-52.878679656, 40.150757595), (-69.849242405, 57.121320344))
            ThreePointArc((-69.849242405, 57.121320344), (-69.849242405, 69.849242405), (-57.121320344, 69.849242405))
            Line((-57.121320344, 69.849242405), (-40.150757595, 52.878679656))
            ThreePointArc((-40.150757595, 52.878679656), (-40.150757595, 40.150757595), (-52.878679656, 40.150757595))
        make_face()
    extrude(amount=-BOSS_EXTRUDE28_2_DEPTH)


with BuildPart() as body_10_2:
    # Sketch36 → Boss-Extrude28 3 (new body)
    with BuildSketch(Plane(origin=(0, 0, 0), x_dir=(1, 0, 0), z_dir=(0, 1, 0))):
        with BuildLine():
            Line((52.878679656, -40.150757595), (69.849242405, -57.121320344))
            ThreePointArc((69.849242405, -57.121320344), (69.849242405, -69.849242405), (57.121320344, -69.849242405))
            Line((57.121320344, -69.849242405), (40.150757595, -52.878679656))
            ThreePointArc((40.150757595, -52.878679656), (40.150757595, -40.150757595), (52.878679656, -40.150757595))
        make_face()
    extrude(amount=-BOSS_EXTRUDE28_3_DEPTH)


with BuildPart() as body_11_2:
    # Sketch36 → Boss-Extrude28 4 (new body)
    with BuildSketch(Plane(origin=(0, 0, 0), x_dir=(1, 0, 0), z_dir=(0, 1, 0))):
        with BuildLine():
            Line((40.150757595, 52.878679656), (57.121320344, 69.849242405))
            ThreePointArc((57.121320344, 69.849242405), (69.849242405, 69.849242405), (69.849242405, 57.121320344))
            Line((69.849242405, 57.121320344), (52.878679656, 40.150757595))
            ThreePointArc((52.878679656, 40.150757595), (40.150757595, 40.150757595), (40.150757595, 52.878679656))
        make_face()
    extrude(amount=-BOSS_EXTRUDE28_4_DEPTH)


with BuildPart() as body_12_2:
    # Sketch40 → Boss-Extrude31 (new body)
    with BuildSketch(Plane(origin=(0, 0, 0), x_dir=(1, 0, 0), z_dir=(0, 1, 0))):
        with Locations((58.5, -58.5)):
            Rectangle(SKETCH40_W, SKETCH40_H)
    extrude(amount=-BOSS_EXTRUDE31_DEPTH)


with BuildPart() as body_13_2:
    # Sketch40 → Boss-Extrude31 2 (new body)
    with BuildSketch(Plane(origin=(0, 0, 0), x_dir=(1, 0, 0), z_dir=(0, 1, 0))):
        with Locations((58.5, 58.5)):
            Rectangle(SKETCH40_W, SKETCH40_H)
    extrude(amount=-BOSS_EXTRUDE31_2_DEPTH)


with BuildPart() as body_14_2_1:
    # Sketch40 → Boss-Extrude31 3 (new body)
    with BuildSketch(Plane(origin=(0, 0, 0), x_dir=(1, 0, 0), z_dir=(0, 1, 0))):
        with Locations((-58.5, 58.5)):
            Rectangle(SKETCH40_W, SKETCH40_H)
    extrude(amount=-BOSS_EXTRUDE31_3_DEPTH)


with BuildPart() as body_15_3:
    # Sketch40 → Boss-Extrude31 4 (new body)
    with BuildSketch(Plane(origin=(0, 0, 0), x_dir=(1, 0, 0), z_dir=(0, 1, 0))):
        with Locations((-58.5, -58.5)):
            Rectangle(SKETCH40_W, SKETCH40_H)
    extrude(amount=-BOSS_EXTRUDE31_4_DEPTH)


with BuildPart() as body_12_2_1:
    add(body_12_2.part)

    # Combine15: union body 13 2, body 14 2, body 15 3, body 14
    add(body_13_2.part)
    add(body_14_2_1.part)
    add(body_15_3.part)
    add(body_14_2.part)

    # Combine16: cut body 11 2, body 10 2, body 9 2, body 8 2
    add(body_11_2.part, mode=Mode.SUBTRACT)
    add(body_10_2.part, mode=Mode.SUBTRACT)
    add(body_9_2.part, mode=Mode.SUBTRACT)
    add(body_8_2.part, mode=Mode.SUBTRACT)

    # Combine17: cut body 8, body 7, body 6, body 5, body 4, body 3
    add(body_8.part, mode=Mode.SUBTRACT)
    add(body_7.part, mode=Mode.SUBTRACT)
    add(body_6.part, mode=Mode.SUBTRACT)
    add(body_5.part, mode=Mode.SUBTRACT)
    add(body_4.part, mode=Mode.SUBTRACT)
    add(body_3.part, mode=Mode.SUBTRACT)


with BuildPart() as body_2_2:
    # Sketch41 → Boss-Extrude32 (new, through all)
    with BuildSketch(Plane(origin=(0, 0, -75), x_dir=(-1, 0, 0), z_dir=(0, 0, -1))):
        with Locations((-45, -45)):
            Circle(SKETCH41_R)
    extrude(amount=-BOSS_EXTRUDE32_DEPTH)


with BuildPart() as body_3_2:
    # Sketch41 → Boss-Extrude32 2 (new, through all)
    with BuildSketch(Plane(origin=(0, 0, -75), x_dir=(-1, 0, 0), z_dir=(0, 0, -1))):
        with Locations((-15, -45)):
            Circle(SKETCH41_R)
    extrude(amount=-BOSS_EXTRUDE32_2_DEPTH)


with BuildPart() as body_4_2:
    # Sketch41 → Boss-Extrude32 3 (new, through all)
    with BuildSketch(Plane(origin=(0, 0, -75), x_dir=(-1, 0, 0), z_dir=(0, 0, -1))):
        with Locations((15, -45)):
            Circle(SKETCH41_R)
    extrude(amount=-BOSS_EXTRUDE32_3_DEPTH)


with BuildPart() as body_5_2:
    # Sketch41 → Boss-Extrude32 4 (new, through all)
    with BuildSketch(Plane(origin=(0, 0, -75), x_dir=(-1, 0, 0), z_dir=(0, 0, -1))):
        with Locations((45, -45)):
            Circle(SKETCH41_R)
    extrude(amount=-BOSS_EXTRUDE32_4_DEPTH)


with BuildPart() as body_12_2_2:
    add(body_12_2_1.part)

    # Combine18: cut body 4 2, body 3 2, body 2 2, body 5 2
    add(body_4_2.part, mode=Mode.SUBTRACT)
    add(body_3_2.part, mode=Mode.SUBTRACT)
    add(body_2_2.part, mode=Mode.SUBTRACT)
    add(body_5_2.part, mode=Mode.SUBTRACT)

    # Fillet14
    # the kernel refuses this fillet: 15 mm, written as the material it takes off along each edge
    with BuildSketch(Plane(origin=(-46, 34.5, 46), x_dir=(-1, 0, 0), z_dir=(0, -1, 0))) as fillet14_piece_1_section:
        with BuildLine():
            CenterArc((FILLET14_R, -FILLET14_R), FILLET14_R, 90, 90)
            Line((0, -FILLET14_R), (0, 0))
            Line((0, 0), (FILLET14_R, 0))
        make_face()
    fillet14_piece_1 = extrude(amount=76.5, mode=Mode.PRIVATE)
    fillet14_piece_1 = split(fillet14_piece_1, bisect_by=Plane(origin=(-59.35249566, 0, 46.045676814), z_dir=(0, -1, 0)), keep=Keep.TOP, mode=Mode.PRIVATE)
    add(fillet14_piece_1, mode=Mode.SUBTRACT)
    with BuildSketch(Plane(origin=(-46, 34.5, -46), x_dir=(-1, 0, 0), z_dir=(0, -1, 0))) as fillet14_piece_2_section:
        with BuildLine():
            CenterArc((FILLET14_R, FILLET14_R), FILLET14_R, 180, 90)
            Line((0, FILLET14_R), (0, 0))
            Line((0, 0), (FILLET14_R, 0))
        make_face()
    fillet14_piece_2 = extrude(amount=76.5, mode=Mode.PRIVATE)
    fillet14_piece_2 = split(fillet14_piece_2, bisect_by=Plane(origin=(-59.35249566, 0, -46.045676814), z_dir=(0, -1, 0)), keep=Keep.TOP, mode=Mode.PRIVATE)
    add(fillet14_piece_2, mode=Mode.SUBTRACT)
    with BuildSketch(Plane(origin=(46, 34.5, -46), x_dir=(0, 0, -1), z_dir=(0, -1, 0))) as fillet14_piece_3_section:
        with BuildLine():
            CenterArc((FILLET14_R, FILLET14_R), FILLET14_R, 180, 90)
            Line((0, FILLET14_R), (0, 0))
            Line((0, 0), (FILLET14_R, 0))
        make_face()
    fillet14_piece_3 = extrude(amount=76.5, mode=Mode.PRIVATE)
    fillet14_piece_3 = split(fillet14_piece_3, bisect_by=Plane(origin=(46.045676814, 0, -59.35249566), z_dir=(0, -1, 0)), keep=Keep.TOP, mode=Mode.PRIVATE)
    add(fillet14_piece_3, mode=Mode.SUBTRACT)
    with BuildSketch(Plane(origin=(46, 34.5, 46), x_dir=(1, 0, 0), z_dir=(0, -1, 0))) as fillet14_piece_4_section:
        with BuildLine():
            CenterArc((FILLET14_R, FILLET14_R), FILLET14_R, 180, 90)
            Line((0, FILLET14_R), (0, 0))
            Line((0, 0), (FILLET14_R, 0))
        make_face()
    fillet14_piece_4 = extrude(amount=76.5, mode=Mode.PRIVATE)
    fillet14_piece_4 = split(fillet14_piece_4, bisect_by=Plane(origin=(59.35249566, 0, 46.045676814), z_dir=(0, -1, 0)), keep=Keep.TOP, mode=Mode.PRIVATE)
    add(fillet14_piece_4, mode=Mode.SUBTRACT)


solid = body_12_2_2.part
